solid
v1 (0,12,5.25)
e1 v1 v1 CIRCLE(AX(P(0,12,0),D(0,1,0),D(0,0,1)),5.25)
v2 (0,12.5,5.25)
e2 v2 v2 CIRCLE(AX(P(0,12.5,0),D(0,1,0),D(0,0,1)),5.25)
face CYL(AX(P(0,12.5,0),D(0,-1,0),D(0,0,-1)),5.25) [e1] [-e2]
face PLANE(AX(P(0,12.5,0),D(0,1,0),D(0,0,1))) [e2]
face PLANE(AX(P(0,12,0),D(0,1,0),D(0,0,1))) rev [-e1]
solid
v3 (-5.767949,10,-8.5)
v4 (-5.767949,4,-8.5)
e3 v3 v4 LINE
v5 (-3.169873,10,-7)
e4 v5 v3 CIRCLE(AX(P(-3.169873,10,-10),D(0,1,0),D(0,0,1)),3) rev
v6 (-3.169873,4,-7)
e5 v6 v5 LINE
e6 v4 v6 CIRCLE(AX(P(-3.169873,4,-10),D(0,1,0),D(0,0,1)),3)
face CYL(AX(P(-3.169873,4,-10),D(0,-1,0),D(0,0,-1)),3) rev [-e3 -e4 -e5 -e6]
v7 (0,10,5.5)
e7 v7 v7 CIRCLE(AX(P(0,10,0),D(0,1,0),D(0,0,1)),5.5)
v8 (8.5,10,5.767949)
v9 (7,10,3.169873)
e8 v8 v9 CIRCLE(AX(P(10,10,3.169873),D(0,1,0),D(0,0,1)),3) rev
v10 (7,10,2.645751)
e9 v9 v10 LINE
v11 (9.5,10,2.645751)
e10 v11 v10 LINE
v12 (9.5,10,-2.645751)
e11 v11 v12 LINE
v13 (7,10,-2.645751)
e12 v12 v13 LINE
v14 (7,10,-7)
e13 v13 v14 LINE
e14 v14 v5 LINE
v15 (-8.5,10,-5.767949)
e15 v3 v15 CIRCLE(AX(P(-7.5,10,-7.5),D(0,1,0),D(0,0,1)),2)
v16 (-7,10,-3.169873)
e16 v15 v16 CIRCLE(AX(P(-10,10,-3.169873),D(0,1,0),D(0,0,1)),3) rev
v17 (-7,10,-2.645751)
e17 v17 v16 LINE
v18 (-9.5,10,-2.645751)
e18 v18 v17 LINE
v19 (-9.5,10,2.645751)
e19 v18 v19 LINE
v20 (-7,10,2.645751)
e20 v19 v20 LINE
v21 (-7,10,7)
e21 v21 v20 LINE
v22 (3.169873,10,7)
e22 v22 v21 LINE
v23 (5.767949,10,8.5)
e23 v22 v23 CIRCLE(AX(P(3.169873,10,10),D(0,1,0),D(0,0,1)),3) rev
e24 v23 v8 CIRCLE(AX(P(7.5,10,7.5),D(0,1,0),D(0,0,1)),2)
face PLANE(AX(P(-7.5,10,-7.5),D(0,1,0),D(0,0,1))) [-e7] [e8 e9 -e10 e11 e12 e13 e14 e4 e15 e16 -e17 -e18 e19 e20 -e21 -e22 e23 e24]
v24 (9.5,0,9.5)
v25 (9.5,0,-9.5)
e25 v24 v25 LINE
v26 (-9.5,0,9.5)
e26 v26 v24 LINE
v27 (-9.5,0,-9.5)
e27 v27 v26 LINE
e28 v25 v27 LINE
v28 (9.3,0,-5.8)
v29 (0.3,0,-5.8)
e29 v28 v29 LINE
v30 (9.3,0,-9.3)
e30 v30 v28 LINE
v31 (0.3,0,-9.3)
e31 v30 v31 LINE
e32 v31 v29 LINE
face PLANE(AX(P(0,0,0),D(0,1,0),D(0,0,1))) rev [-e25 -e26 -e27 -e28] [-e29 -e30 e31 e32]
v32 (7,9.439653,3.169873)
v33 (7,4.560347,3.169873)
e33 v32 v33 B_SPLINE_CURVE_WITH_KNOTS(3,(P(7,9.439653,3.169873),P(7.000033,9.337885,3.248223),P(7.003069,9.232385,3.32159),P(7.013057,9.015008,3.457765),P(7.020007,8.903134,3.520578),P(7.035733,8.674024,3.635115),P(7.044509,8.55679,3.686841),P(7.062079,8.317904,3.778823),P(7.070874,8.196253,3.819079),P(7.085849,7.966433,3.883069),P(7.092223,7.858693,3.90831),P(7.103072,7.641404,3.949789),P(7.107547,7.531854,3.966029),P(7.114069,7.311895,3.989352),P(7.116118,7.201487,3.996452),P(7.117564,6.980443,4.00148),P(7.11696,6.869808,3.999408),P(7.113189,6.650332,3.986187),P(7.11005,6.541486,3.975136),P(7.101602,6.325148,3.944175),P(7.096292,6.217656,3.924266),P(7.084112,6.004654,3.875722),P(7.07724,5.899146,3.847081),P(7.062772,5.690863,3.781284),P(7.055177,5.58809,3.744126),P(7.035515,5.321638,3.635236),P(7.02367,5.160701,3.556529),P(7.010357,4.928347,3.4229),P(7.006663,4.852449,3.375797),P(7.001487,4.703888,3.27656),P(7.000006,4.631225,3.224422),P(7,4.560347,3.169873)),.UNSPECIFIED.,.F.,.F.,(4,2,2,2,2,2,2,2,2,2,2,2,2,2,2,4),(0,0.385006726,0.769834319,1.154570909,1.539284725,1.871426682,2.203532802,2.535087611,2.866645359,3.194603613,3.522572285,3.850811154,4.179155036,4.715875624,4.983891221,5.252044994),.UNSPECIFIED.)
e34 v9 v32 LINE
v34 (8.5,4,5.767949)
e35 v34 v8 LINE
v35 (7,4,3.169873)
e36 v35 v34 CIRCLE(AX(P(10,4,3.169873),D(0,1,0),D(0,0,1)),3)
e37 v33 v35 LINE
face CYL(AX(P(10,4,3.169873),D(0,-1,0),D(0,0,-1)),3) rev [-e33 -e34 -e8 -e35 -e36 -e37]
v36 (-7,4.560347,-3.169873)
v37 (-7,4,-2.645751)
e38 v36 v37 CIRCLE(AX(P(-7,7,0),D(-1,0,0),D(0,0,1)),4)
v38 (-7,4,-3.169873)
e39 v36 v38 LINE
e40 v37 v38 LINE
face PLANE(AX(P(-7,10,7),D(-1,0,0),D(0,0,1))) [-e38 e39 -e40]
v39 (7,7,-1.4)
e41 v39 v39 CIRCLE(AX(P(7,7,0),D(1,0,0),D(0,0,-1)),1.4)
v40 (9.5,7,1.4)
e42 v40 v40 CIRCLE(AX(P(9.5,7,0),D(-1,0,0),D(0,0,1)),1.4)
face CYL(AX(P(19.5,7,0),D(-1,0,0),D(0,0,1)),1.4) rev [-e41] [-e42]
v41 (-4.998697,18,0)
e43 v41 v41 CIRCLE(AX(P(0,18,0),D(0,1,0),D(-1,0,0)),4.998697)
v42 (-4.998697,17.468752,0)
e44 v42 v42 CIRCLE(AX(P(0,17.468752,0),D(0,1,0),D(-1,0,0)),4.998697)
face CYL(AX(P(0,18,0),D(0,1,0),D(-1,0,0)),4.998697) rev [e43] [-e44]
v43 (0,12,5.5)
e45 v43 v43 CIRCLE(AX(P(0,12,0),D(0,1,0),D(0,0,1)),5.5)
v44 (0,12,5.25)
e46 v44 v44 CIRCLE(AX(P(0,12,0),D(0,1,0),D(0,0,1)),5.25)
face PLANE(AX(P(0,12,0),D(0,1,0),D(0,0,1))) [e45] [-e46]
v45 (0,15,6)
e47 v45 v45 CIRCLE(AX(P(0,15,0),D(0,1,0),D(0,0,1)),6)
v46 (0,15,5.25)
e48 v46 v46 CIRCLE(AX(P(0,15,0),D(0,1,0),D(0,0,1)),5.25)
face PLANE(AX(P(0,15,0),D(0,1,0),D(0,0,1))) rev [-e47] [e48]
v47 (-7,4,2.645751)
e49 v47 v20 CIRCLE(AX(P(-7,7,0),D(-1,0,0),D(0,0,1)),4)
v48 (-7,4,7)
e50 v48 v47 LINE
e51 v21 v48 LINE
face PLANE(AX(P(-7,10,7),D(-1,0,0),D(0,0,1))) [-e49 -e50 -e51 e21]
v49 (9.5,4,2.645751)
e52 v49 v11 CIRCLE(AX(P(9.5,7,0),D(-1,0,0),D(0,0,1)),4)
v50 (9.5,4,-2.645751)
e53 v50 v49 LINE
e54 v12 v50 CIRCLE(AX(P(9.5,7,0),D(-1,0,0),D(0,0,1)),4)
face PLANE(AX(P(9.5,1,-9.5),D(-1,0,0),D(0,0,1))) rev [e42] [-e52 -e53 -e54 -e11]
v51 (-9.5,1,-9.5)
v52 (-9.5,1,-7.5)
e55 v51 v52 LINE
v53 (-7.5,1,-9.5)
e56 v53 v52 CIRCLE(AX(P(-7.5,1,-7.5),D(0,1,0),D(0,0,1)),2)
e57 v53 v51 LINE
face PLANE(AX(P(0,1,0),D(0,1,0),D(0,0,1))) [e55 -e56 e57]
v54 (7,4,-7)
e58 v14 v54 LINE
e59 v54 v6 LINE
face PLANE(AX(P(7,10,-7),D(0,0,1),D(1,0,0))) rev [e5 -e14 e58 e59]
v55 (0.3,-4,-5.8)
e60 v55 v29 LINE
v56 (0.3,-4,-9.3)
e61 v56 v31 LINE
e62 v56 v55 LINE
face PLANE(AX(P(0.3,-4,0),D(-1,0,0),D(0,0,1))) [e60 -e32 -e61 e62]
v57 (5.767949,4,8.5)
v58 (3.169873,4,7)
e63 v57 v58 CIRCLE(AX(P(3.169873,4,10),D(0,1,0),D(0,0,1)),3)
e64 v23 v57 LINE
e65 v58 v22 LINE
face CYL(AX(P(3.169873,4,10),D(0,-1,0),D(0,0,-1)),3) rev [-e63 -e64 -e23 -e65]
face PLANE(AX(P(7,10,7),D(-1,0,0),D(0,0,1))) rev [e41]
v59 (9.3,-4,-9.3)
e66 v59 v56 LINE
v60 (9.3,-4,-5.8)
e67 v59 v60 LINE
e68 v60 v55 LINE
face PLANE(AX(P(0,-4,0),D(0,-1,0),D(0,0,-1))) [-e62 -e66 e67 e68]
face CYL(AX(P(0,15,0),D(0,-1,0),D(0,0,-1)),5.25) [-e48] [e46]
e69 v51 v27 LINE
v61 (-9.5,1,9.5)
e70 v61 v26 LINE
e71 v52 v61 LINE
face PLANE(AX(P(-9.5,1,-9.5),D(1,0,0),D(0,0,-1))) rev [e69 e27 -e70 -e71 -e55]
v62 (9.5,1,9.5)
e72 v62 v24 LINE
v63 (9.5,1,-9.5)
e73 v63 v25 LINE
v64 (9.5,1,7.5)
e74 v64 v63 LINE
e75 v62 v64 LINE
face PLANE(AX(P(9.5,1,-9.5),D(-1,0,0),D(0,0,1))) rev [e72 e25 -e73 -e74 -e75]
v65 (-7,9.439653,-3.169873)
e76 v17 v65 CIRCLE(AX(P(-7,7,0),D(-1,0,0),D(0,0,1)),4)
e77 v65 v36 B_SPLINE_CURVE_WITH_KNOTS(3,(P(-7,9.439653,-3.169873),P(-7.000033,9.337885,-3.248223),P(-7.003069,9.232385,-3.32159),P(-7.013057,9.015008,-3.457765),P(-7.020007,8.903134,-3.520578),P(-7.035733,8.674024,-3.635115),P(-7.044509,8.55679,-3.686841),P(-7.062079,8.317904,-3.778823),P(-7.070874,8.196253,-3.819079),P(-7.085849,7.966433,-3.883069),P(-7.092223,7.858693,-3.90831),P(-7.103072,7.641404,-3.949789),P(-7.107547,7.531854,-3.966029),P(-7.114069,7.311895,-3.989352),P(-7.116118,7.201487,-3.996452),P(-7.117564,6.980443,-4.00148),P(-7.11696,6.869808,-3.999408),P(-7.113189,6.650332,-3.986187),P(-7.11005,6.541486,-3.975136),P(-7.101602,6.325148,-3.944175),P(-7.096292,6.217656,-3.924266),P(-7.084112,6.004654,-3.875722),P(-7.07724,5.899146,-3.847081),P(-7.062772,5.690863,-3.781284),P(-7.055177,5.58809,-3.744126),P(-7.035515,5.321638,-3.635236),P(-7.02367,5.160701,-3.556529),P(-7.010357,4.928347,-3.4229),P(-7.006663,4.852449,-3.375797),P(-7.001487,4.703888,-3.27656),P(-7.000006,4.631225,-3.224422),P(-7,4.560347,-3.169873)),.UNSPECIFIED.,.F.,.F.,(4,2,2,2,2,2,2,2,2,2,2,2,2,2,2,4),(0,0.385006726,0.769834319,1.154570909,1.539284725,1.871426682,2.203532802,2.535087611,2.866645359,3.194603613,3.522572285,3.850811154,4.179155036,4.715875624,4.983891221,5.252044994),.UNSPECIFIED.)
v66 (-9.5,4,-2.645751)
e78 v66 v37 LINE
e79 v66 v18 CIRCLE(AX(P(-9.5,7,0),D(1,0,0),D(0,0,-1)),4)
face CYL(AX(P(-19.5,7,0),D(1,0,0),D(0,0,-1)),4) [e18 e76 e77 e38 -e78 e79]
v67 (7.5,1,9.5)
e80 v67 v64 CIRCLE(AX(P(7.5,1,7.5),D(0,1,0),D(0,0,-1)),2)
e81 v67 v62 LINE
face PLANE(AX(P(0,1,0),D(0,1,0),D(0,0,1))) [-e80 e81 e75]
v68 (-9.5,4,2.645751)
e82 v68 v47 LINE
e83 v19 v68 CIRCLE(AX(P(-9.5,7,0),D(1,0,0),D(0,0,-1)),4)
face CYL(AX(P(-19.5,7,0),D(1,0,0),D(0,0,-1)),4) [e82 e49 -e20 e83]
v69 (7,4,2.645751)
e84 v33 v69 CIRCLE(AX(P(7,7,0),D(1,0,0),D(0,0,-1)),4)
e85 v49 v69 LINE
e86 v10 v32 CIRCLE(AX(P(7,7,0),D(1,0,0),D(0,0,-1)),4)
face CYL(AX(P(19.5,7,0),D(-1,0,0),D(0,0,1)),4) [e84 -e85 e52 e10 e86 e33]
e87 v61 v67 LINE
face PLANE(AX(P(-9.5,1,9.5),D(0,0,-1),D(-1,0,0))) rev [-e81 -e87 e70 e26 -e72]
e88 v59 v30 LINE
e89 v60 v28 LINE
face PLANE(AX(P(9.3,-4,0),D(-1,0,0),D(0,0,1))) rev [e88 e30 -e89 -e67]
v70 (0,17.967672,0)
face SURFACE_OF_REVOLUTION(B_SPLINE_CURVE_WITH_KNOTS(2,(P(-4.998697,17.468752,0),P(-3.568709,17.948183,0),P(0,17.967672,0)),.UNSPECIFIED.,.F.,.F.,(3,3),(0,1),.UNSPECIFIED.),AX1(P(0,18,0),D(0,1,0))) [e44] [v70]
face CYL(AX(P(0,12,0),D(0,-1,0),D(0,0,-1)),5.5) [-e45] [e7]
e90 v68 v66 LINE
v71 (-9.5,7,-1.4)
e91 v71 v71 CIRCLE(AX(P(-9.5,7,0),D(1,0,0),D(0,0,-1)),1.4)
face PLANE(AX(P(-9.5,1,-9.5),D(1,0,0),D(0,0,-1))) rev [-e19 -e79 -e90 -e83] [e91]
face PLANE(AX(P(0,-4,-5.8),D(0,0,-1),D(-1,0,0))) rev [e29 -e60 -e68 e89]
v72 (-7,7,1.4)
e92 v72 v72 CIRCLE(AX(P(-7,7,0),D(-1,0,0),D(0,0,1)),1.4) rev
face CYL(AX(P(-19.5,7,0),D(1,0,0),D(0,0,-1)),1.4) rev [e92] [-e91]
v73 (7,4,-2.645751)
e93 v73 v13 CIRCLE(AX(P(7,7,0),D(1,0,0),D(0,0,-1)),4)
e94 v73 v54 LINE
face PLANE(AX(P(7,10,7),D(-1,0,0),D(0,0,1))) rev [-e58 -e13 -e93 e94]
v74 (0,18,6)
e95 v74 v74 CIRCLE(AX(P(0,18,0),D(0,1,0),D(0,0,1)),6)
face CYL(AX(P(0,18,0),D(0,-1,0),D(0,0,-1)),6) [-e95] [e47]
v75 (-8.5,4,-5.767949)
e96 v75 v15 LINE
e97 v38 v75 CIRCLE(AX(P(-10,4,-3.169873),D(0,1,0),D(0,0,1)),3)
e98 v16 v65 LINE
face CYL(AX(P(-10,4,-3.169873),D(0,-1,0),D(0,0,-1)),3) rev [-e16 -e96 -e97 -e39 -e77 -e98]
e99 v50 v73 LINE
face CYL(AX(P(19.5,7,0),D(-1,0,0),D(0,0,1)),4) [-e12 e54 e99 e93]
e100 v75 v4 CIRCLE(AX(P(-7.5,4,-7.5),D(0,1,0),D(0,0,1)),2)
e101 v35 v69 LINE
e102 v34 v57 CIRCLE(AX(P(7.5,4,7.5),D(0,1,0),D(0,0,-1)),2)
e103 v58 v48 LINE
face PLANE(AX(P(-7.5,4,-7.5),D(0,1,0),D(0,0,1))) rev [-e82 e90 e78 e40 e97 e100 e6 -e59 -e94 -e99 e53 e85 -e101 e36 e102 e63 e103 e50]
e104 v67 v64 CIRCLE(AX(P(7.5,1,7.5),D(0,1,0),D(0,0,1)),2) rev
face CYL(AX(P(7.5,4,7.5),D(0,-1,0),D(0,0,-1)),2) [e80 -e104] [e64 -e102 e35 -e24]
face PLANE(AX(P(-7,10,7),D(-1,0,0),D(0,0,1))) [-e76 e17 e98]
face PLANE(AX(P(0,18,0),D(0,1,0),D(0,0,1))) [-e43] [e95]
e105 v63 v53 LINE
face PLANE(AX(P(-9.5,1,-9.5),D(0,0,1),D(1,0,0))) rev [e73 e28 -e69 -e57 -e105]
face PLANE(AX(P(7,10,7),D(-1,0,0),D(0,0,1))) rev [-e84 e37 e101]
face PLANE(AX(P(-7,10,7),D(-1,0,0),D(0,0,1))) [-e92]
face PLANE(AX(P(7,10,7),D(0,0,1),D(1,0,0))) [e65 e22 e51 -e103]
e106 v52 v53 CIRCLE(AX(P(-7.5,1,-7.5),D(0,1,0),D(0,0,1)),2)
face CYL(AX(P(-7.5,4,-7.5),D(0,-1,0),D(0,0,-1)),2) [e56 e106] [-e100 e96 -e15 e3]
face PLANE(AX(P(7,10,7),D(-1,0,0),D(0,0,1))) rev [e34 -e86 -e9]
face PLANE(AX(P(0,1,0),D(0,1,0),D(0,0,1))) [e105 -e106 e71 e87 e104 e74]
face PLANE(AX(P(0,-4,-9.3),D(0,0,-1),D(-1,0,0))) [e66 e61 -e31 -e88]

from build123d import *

# Parameters (mm, degrees)
SKETCH1_W            = 19
SKETCH1_H            = 19
BOSS_EXTRUDE1_DEPTH  = 1
SKETCH2_R            = 2
BOSS_EXTRUDE2_DEPTH  = 3
SKETCH3_R            = 2
SKETCH3_W            = 14
SKETCH3_H            = 14
BOSS_EXTRUDE3_DEPTH  = 6
SKETCH4_R            = 1.4
BOSS_EXTRUDE4_DEPTH  = 2.5
BOSS_EXTRUDE5_START  = 2.5
SKETCH5_R            = 1.4
BOSS_EXTRUDE5_DEPTH  = 2.5
SKETCH6_R            = 5.5
BOSS_EXTRUDE6_DEPTH  = 2
SKETCH7_R            = 5.25
BOSS_EXTRUDE7_DEPTH  = 3
SKETCH8_R            = 6
BOSS_EXTRUDE8_DEPTH  = 3
SKETCH12_W           = 9
SKETCH12_H           = 3.5
BOSS_EXTRUDE9_DEPTH  = 4
FILLET1_START        = 4
FILLET1_DEPTH        = 6
SKETCH14_R           = 5.25
BOSS_EXTRUDE11_DEPTH = 0.5


with BuildPart() as part:
    # Sketch1 → Boss-Extrude1 (new body)
    with BuildSketch(Plane(origin=(0, 0, 0), x_dir=(1, 0, 0), z_dir=(0, 1, 0))):
        Rectangle(SKETCH1_W, SKETCH1_H)
    extrude(amount=BOSS_EXTRUDE1_DEPTH)

    # Sketch2 → Boss-Extrude2 (add)
    with BuildSketch(Plane(origin=(0, 1, 0), x_dir=(1, 0, 0), z_dir=(0, 1, 0))):
        with Locations(Location((-7.5, 7.5, 0), (0, 0, 90))):
            Circle(SKETCH2_R)
        with Locations(Location((7.5, -7.5, 0), (0, 0, 90))):
            Circle(SKETCH2_R)
    extrude(amount=BOSS_EXTRUDE2_DEPTH)

    # Sketch3 → Boss-Extrude3 (add)
    with BuildSketch(Plane(origin=(0, 4, 0), x_dir=(1, 0, 0), z_dir=(0, 1, 0))):
        with Locations(Location((7.5, -7.5, 0), (0, 0, 104.477512186))):
            Circle(SKETCH3_R)
        with Locations(Location((-7.5, 7.5, 0), (0, 0, 90))):
            Circle(SKETCH3_R)
        Rectangle(SKETCH3_W, SKETCH3_H)
    extrude(amount=BOSS_EXTRUDE3_DEPTH)

    # Sketch4 → Boss-Extrude4 (add)
    with BuildSketch(Plane.ZY.offset(7)):
        with BuildLine():
            ThreePointArc((4, 7), (3.645751311, 8.645751311), (2.645751311, 10))
            Line((2.645751311, 10), (-2.645751311, 10))
            ThreePointArc((-2.645751311, 10), (-3.645751311, 8.645751311), (-4, 7))
            ThreePointArc((-4, 7), (-3.645751311, 5.354248689), (-2.645751311, 4))
            Line((-2.645751311, 4), (2.645751311, 4))
            ThreePointArc((2.645751311, 4), (3.645751311, 5.354248689), (4, 7))
        make_face()
        with Locations(Location((0, 7, 0), (0, 0, 180))):
            Circle(SKETCH4_R, mode=Mode.SUBTRACT)
    extrude(amount=BOSS_EXTRUDE4_DEPTH)

    # Sketch5 → Boss-Extrude5 (add)
    with BuildSketch(Plane(origin=(7, 0, 0), x_dir=(0, 0, -1), z_dir=(1, 0, 0)).offset(BOSS_EXTRUDE5_START)):
        with BuildLine():
            Line((-2.645751311, 4), (2.645751311, 4))
            ThreePointArc((2.645751311, 4), (4, 7), (2.645751311, 10))
            Line((2.645751311, 10), (-2.645751311, 10))
            ThreePointArc((-2.645751311, 10), (-4, 7), (-2.645751311, 4))
        make_face()
        with Locations((0, 7)):
            Circle(SKETCH5_R, mode=Mode.SUBTRACT)
    extrude(amount=-BOSS_EXTRUDE5_DEPTH)

    # Sketch6 → Boss-Extrude6 (add)
    with BuildSketch(Plane(origin=(0, 10, 0), x_dir=(1, 0, 0), z_dir=(0, 1, 0))):
        with Locations(Location((0, 0, 0), (0, 0, 270))):
            Circle(SKETCH6_R)
    extrude(amount=BOSS_EXTRUDE6_DEPTH)

    # Sketch7 → Boss-Extrude7 (add)
    with BuildSketch(Plane(origin=(0, 12, 0), x_dir=(1, 0, 0), z_dir=(0, 1, 0))):
        with Locations(Location((0, 0, 0), (0, 0, 270))):
            Circle(SKETCH7_R)
    extrude(amount=BOSS_EXTRUDE7_DEPTH)

    # Sketch8 → Boss-Extrude8 (add)
    with BuildSketch(Plane(origin=(0, 15, 0), x_dir=(1, 0, 0), z_dir=(0, 1, 0))):
        with Locations(Location((0, 0, 0), (0, 0, 270))):
            Circle(SKETCH8_R)
    extrude(amount=BOSS_EXTRUDE8_DEPTH)

    # Sketch11 → Cut-Revolve3 (revolve, cut)
    with BuildSketch(Plane.XY):
        with BuildLine():
            Line((-4.998697143, 18), (-4.998697143, 17.468751676))
            add(Edge.make_bspline(
                [(-4.998697143, 17.468751676), (-3.568709189, 17.948183153), (0, 17.967671606)],
                knots=[0, 0, 0, 1, 1, 1], degree=2))
            Line((0, 17.967671606), (0, 18))
            Line((0, 18), (-4.998697143, 18))
        make_face()
    revolve(axis=Axis((0, 18, 0), (0, -1, 0)), mode=Mode.SUBTRACT)

    # Sketch12 → Boss-Extrude9 (add)
    with BuildSketch(Plane.XZ):
        with Locations((4.8, -7.55)):
            Rectangle(SKETCH12_W, SKETCH12_H)
    extrude(amount=BOSS_EXTRUDE9_DEPTH)

    # Fillet1: read off the stored shape, not the designer's step
    # Fillet1 outline → Fillet1 (add)
    with BuildSketch(Plane(origin=(0, 0, 0), x_dir=(1, 0, 0), z_dir=(0, 1, 0)).offset(FILLET1_START)):
        with BuildLine():
            ThreePointArc((-7, 5.563508327), (-7.770090757, 5.518321171), (-8.5, 5.767949192))
            ThreePointArc((-8.5, 5.767949192), (-7.401923789, 4.669872981), (-7, 3.169872981))
            Line((-7, 3.169872981), (-7, 5.563508327))
        make_face()
        with BuildLine():
            ThreePointArc((-3.169872981, 7), (-4.669872981, 7.401923789), (-5.767949192, 8.5))
            ThreePointArc((-5.767949192, 8.5), (-5.518321171, 7.770090757), (-5.563508327, 7))
            Line((-5.563508327, 7), (-3.169872981, 7))
        make_face()
        with BuildLine():
            ThreePointArc((7, -5.563508327), (7.770090757, -5.518321171), (8.5, -5.767949192))
            ThreePointArc((8.5, -5.767949192), (7.401923789, -4.669872981), (7, -3.169872981))
            Line((7, -3.169872981), (7, -5.563508327))
        make_face()
        with BuildLine():
            ThreePointArc((3.169872981, -7), (4.669872981, -7.401923789), (5.767949192, -8.5))
            ThreePointArc((5.767949192, -8.5), (5.518321171, -7.770090757), (5.563508327, -7))
            Line((5.563508327, -7), (3.169872981, -7))
        make_face()
    extrude(amount=FILLET1_DEPTH)


with BuildPart() as body_2:
    # Sketch14 → Boss-Extrude11 (new body)
    with BuildSketch(Plane(origin=(0, 12, 0), x_dir=(1, 0, 0), z_dir=(0, 1, 0))):
        with Locations(Location((0, 0, 0), (0, 0, 270))):
            Circle(SKETCH14_R)
    extrude(amount=BOSS_EXTRUDE11_DEPTH)


solid = Compound([part.part, body_2.part])
